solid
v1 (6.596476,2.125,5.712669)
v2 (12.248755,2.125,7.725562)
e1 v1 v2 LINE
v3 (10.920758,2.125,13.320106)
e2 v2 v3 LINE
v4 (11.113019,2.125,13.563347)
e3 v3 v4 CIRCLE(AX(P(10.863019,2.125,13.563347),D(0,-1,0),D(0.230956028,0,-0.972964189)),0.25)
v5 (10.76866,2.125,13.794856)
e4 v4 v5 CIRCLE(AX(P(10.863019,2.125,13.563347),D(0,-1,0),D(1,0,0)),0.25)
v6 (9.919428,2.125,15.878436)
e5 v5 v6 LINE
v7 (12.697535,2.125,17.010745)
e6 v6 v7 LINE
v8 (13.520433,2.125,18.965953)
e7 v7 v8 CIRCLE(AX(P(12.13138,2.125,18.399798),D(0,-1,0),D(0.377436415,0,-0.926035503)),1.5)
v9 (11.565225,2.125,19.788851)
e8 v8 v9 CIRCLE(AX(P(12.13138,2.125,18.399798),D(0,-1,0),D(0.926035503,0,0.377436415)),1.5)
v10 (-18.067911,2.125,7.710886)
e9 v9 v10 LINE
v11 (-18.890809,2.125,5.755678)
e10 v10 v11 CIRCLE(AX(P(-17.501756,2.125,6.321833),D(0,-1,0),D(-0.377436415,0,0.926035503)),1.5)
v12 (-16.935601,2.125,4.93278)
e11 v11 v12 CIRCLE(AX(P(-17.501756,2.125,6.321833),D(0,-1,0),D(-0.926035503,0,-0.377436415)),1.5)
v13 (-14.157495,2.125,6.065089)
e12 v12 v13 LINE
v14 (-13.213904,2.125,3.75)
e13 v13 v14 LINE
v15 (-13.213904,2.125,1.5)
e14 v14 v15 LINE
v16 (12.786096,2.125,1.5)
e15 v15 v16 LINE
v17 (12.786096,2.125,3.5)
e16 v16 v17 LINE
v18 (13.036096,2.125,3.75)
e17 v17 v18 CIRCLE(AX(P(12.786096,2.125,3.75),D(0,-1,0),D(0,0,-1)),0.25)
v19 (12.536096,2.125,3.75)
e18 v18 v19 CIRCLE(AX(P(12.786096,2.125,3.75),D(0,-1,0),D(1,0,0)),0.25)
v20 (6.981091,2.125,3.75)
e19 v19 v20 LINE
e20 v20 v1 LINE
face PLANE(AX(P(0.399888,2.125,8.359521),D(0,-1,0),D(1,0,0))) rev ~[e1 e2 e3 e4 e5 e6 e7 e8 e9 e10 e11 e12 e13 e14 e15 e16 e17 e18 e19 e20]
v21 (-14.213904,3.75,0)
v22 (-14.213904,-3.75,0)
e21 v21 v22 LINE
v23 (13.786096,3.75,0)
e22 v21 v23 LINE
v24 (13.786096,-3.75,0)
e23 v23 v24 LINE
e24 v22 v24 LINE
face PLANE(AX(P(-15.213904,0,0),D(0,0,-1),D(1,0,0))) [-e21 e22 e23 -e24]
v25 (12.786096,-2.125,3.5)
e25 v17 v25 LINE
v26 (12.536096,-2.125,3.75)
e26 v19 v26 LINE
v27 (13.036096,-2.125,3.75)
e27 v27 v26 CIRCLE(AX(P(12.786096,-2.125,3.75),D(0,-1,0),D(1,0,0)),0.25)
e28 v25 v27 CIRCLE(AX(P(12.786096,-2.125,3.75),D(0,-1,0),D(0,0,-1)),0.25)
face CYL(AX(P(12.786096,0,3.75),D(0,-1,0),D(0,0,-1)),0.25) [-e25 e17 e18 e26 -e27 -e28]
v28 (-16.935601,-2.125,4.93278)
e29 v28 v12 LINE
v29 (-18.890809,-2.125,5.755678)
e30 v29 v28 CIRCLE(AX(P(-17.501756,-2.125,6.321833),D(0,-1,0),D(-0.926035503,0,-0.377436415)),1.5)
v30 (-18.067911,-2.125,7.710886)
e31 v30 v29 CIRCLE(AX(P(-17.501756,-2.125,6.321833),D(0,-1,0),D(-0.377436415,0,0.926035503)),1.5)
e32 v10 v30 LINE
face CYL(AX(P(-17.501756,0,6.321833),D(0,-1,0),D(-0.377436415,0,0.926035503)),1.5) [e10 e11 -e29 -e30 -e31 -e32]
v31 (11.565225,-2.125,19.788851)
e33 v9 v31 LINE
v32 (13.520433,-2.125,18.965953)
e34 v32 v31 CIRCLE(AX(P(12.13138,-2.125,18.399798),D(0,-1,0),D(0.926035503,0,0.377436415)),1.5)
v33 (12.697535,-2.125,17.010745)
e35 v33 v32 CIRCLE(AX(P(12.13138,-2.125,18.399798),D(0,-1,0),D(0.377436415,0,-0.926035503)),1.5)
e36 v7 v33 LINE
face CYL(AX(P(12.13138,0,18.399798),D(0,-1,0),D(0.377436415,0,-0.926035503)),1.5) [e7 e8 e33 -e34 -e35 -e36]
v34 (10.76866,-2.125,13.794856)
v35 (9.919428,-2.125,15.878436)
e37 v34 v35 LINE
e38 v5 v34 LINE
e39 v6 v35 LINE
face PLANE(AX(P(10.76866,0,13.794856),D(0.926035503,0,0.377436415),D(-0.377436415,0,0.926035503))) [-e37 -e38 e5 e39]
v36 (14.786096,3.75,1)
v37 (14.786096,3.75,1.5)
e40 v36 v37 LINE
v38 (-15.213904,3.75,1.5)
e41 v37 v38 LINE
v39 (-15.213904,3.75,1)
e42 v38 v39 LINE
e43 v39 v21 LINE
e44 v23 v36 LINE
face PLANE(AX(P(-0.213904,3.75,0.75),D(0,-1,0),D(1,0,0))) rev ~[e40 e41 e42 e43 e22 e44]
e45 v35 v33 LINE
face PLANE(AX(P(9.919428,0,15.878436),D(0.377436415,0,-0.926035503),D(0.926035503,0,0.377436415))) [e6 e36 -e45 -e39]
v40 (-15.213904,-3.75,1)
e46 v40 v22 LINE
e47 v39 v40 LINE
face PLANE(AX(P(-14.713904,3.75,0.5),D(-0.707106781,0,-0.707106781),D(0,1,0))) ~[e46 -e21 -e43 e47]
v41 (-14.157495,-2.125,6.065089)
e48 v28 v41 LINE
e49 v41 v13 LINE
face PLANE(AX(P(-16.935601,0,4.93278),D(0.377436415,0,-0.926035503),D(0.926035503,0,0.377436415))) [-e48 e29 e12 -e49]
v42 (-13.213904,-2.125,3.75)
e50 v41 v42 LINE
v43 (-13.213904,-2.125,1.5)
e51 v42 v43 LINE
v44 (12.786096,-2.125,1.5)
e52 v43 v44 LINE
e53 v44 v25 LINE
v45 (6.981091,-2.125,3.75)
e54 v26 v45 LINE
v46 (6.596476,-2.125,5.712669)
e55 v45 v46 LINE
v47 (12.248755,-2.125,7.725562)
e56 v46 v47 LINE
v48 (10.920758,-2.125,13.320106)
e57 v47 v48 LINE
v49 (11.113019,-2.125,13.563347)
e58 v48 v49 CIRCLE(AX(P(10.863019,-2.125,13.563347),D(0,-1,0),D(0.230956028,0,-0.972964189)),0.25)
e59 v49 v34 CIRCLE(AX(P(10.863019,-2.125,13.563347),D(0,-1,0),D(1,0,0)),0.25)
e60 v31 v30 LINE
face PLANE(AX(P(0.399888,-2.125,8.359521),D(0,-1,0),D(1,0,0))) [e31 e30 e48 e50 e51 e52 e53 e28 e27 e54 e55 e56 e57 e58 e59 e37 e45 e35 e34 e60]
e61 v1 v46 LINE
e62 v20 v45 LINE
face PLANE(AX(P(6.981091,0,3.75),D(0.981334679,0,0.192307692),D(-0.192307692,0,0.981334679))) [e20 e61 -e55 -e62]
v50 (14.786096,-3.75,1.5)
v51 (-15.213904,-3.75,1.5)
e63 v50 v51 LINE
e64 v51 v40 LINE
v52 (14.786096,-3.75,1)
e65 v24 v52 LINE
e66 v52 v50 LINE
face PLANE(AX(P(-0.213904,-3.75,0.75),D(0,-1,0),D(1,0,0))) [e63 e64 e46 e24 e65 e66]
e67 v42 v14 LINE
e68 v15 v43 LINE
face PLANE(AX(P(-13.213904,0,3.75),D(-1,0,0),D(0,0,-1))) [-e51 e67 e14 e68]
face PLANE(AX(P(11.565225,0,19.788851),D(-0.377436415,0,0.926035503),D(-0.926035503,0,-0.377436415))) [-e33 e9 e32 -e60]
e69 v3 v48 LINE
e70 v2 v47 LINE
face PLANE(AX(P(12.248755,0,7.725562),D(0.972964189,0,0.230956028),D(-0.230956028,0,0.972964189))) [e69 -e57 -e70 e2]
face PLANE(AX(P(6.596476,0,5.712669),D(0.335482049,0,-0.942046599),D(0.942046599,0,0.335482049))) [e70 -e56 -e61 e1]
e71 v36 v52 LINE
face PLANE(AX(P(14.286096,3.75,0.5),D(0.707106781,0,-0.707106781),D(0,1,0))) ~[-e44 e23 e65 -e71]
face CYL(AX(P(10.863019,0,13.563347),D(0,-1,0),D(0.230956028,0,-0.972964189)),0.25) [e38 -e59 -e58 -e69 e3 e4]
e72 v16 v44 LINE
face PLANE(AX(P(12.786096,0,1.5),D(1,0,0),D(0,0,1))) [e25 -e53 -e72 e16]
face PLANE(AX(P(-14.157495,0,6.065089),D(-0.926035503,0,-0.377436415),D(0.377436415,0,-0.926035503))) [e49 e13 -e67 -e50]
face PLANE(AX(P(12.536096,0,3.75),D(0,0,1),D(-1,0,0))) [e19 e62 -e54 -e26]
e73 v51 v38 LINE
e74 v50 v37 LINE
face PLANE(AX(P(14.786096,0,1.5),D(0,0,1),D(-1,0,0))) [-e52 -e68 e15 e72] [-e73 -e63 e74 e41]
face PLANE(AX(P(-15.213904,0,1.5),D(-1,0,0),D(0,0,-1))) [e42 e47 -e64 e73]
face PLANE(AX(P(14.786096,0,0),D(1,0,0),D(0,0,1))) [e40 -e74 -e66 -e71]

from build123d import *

# Parameters (mm, degrees)
F1_DEPTH = 3.75
F2_DEPTH = 2.125
F3_SIZE  = 1


# Not quite as in the source:
# - a feature names something its author has since deleted; it is built from what else it names


with BuildPart() as f1:
    # F0 (on Front) → F1 (new body, symmetric)
    with BuildSketch(Plane.XZ):
        Polygon((-15.2139038764, 1.5), (-15.2139038764, 0), (14.7860961236, 0), (14.7860961236, 1.5), (12.7860961236, 1.5), (-13.2139038764, 1.5), align=None)
    extrude(amount=F1_DEPTH, both=True)

    # F0 (on Front) → F2 (join, symmetric)
    with BuildSketch(Plane.XZ):
        with BuildLine():
            Line((-13.2139038764, 3.75), (-13.2139038764, 1.5))
            Line((-13.2139038764, 1.5), (12.7860961236, 1.5))
            Line((12.7860961236, 1.5), (12.7860961236, 3.5))
            ThreePointArc((12.7860961236, 3.5), (12.6093194283, 3.5732233047), (12.5360961236, 3.75))
            Line((12.5360961236, 3.75), (6.9810911579, 3.75))
            Line((6.9810911579, 3.75), (6.5964757732, 5.7126693573))
            Line((6.5964757732, 5.7126693573), (12.2487553674, 7.7255616518))
            Line((12.2487553674, 7.7255616518), (10.9207582075, 13.320105739))
            ThreePointArc((10.9207582075, 13.320105739), (10.6249391085, 13.4870718246), (10.7686600969, 13.794855662))
            Line((10.7686600969, 13.794855662), (9.9194281634, 15.8784355437))
            Line((9.9194281634, 15.8784355437), (12.6975346723, 17.0107447883))
            ThreePointArc((12.6975346723, 17.0107447883), (13.5139207983, 17.8179208397), (13.5204333045, 18.965952665))
            ThreePointArc((13.5204333045, 18.965952665), (12.713257253, 19.782338791), (11.5652254277, 19.7888512971))
            Line((11.5652254277, 19.7888512971), (-18.0679106669, 7.7108860217))
            ThreePointArc((-18.0679106669, 7.7108860217), (-18.8842967929, 6.9037099703), (-18.8908092991, 5.755678145))
            ThreePointArc((-18.8908092991, 5.755678145), (-18.0836332477, 4.939292019), (-16.9356014224, 4.9327795128))
            Line((-16.9356014224, 4.9327795128), (-14.1574949135, 6.0650887574))
            Line((-14.1574949135, 6.0650887574), (-13.2139038764, 3.75))
        make_face()
        with BuildLine():
            ThreePointArc((12.5360961236, 3.75), (12.6093194283, 3.5732233047), (12.7860961236, 3.5))
            Line((12.7860961236, 3.5), (12.7860961236, 3.75))
            Line((12.7860961236, 3.75), (12.5360961236, 3.75))
        make_face()
        with BuildLine():
            Line((12.7860961236, 3.75), (12.7860961236, 3.5))
            ThreePointArc((12.7860961236, 3.5), (12.9628728189, 3.5732233047), (13.0360961236, 3.75))
            ThreePointArc((13.0360961236, 3.75), (12.7860961236, 4), (12.5360961236, 3.75))
            Line((12.5360961236, 3.75), (12.7860961236, 3.75))
        make_face()
        with BuildLine():
            Line((10.8630192006, 13.5633467863), (10.9207582075, 13.320105739))
            ThreePointArc((10.9207582075, 13.320105739), (11.0591502177, 13.4083221943), (11.1130192006, 13.5633467863))
            ThreePointArc((11.1130192006, 13.5633467863), (11.0025007837, 13.7708194061), (10.7686600969, 13.794855662))
            Line((10.7686600969, 13.794855662), (10.8630192006, 13.5633467863))
        make_face()
        with BuildLine():
            ThreePointArc((10.7686600969, 13.794855662), (10.6249391085, 13.4870718246), (10.9207582075, 13.320105739))
            Line((10.9207582075, 13.320105739), (10.8630192006, 13.5633467863))
            Line((10.8630192006, 13.5633467863), (10.7686600969, 13.794855662))
        make_face()
    extrude(amount=F2_DEPTH, both=True)

    # F3
    f3_edges = [f1.edges().sort_by_distance(p)[0] for p in [
        (14.786096, 0, 0),
        (-15.213904, 0, 0),
    ]]
    chamfer(f3_edges, length=F3_SIZE)


solid = f1.part
